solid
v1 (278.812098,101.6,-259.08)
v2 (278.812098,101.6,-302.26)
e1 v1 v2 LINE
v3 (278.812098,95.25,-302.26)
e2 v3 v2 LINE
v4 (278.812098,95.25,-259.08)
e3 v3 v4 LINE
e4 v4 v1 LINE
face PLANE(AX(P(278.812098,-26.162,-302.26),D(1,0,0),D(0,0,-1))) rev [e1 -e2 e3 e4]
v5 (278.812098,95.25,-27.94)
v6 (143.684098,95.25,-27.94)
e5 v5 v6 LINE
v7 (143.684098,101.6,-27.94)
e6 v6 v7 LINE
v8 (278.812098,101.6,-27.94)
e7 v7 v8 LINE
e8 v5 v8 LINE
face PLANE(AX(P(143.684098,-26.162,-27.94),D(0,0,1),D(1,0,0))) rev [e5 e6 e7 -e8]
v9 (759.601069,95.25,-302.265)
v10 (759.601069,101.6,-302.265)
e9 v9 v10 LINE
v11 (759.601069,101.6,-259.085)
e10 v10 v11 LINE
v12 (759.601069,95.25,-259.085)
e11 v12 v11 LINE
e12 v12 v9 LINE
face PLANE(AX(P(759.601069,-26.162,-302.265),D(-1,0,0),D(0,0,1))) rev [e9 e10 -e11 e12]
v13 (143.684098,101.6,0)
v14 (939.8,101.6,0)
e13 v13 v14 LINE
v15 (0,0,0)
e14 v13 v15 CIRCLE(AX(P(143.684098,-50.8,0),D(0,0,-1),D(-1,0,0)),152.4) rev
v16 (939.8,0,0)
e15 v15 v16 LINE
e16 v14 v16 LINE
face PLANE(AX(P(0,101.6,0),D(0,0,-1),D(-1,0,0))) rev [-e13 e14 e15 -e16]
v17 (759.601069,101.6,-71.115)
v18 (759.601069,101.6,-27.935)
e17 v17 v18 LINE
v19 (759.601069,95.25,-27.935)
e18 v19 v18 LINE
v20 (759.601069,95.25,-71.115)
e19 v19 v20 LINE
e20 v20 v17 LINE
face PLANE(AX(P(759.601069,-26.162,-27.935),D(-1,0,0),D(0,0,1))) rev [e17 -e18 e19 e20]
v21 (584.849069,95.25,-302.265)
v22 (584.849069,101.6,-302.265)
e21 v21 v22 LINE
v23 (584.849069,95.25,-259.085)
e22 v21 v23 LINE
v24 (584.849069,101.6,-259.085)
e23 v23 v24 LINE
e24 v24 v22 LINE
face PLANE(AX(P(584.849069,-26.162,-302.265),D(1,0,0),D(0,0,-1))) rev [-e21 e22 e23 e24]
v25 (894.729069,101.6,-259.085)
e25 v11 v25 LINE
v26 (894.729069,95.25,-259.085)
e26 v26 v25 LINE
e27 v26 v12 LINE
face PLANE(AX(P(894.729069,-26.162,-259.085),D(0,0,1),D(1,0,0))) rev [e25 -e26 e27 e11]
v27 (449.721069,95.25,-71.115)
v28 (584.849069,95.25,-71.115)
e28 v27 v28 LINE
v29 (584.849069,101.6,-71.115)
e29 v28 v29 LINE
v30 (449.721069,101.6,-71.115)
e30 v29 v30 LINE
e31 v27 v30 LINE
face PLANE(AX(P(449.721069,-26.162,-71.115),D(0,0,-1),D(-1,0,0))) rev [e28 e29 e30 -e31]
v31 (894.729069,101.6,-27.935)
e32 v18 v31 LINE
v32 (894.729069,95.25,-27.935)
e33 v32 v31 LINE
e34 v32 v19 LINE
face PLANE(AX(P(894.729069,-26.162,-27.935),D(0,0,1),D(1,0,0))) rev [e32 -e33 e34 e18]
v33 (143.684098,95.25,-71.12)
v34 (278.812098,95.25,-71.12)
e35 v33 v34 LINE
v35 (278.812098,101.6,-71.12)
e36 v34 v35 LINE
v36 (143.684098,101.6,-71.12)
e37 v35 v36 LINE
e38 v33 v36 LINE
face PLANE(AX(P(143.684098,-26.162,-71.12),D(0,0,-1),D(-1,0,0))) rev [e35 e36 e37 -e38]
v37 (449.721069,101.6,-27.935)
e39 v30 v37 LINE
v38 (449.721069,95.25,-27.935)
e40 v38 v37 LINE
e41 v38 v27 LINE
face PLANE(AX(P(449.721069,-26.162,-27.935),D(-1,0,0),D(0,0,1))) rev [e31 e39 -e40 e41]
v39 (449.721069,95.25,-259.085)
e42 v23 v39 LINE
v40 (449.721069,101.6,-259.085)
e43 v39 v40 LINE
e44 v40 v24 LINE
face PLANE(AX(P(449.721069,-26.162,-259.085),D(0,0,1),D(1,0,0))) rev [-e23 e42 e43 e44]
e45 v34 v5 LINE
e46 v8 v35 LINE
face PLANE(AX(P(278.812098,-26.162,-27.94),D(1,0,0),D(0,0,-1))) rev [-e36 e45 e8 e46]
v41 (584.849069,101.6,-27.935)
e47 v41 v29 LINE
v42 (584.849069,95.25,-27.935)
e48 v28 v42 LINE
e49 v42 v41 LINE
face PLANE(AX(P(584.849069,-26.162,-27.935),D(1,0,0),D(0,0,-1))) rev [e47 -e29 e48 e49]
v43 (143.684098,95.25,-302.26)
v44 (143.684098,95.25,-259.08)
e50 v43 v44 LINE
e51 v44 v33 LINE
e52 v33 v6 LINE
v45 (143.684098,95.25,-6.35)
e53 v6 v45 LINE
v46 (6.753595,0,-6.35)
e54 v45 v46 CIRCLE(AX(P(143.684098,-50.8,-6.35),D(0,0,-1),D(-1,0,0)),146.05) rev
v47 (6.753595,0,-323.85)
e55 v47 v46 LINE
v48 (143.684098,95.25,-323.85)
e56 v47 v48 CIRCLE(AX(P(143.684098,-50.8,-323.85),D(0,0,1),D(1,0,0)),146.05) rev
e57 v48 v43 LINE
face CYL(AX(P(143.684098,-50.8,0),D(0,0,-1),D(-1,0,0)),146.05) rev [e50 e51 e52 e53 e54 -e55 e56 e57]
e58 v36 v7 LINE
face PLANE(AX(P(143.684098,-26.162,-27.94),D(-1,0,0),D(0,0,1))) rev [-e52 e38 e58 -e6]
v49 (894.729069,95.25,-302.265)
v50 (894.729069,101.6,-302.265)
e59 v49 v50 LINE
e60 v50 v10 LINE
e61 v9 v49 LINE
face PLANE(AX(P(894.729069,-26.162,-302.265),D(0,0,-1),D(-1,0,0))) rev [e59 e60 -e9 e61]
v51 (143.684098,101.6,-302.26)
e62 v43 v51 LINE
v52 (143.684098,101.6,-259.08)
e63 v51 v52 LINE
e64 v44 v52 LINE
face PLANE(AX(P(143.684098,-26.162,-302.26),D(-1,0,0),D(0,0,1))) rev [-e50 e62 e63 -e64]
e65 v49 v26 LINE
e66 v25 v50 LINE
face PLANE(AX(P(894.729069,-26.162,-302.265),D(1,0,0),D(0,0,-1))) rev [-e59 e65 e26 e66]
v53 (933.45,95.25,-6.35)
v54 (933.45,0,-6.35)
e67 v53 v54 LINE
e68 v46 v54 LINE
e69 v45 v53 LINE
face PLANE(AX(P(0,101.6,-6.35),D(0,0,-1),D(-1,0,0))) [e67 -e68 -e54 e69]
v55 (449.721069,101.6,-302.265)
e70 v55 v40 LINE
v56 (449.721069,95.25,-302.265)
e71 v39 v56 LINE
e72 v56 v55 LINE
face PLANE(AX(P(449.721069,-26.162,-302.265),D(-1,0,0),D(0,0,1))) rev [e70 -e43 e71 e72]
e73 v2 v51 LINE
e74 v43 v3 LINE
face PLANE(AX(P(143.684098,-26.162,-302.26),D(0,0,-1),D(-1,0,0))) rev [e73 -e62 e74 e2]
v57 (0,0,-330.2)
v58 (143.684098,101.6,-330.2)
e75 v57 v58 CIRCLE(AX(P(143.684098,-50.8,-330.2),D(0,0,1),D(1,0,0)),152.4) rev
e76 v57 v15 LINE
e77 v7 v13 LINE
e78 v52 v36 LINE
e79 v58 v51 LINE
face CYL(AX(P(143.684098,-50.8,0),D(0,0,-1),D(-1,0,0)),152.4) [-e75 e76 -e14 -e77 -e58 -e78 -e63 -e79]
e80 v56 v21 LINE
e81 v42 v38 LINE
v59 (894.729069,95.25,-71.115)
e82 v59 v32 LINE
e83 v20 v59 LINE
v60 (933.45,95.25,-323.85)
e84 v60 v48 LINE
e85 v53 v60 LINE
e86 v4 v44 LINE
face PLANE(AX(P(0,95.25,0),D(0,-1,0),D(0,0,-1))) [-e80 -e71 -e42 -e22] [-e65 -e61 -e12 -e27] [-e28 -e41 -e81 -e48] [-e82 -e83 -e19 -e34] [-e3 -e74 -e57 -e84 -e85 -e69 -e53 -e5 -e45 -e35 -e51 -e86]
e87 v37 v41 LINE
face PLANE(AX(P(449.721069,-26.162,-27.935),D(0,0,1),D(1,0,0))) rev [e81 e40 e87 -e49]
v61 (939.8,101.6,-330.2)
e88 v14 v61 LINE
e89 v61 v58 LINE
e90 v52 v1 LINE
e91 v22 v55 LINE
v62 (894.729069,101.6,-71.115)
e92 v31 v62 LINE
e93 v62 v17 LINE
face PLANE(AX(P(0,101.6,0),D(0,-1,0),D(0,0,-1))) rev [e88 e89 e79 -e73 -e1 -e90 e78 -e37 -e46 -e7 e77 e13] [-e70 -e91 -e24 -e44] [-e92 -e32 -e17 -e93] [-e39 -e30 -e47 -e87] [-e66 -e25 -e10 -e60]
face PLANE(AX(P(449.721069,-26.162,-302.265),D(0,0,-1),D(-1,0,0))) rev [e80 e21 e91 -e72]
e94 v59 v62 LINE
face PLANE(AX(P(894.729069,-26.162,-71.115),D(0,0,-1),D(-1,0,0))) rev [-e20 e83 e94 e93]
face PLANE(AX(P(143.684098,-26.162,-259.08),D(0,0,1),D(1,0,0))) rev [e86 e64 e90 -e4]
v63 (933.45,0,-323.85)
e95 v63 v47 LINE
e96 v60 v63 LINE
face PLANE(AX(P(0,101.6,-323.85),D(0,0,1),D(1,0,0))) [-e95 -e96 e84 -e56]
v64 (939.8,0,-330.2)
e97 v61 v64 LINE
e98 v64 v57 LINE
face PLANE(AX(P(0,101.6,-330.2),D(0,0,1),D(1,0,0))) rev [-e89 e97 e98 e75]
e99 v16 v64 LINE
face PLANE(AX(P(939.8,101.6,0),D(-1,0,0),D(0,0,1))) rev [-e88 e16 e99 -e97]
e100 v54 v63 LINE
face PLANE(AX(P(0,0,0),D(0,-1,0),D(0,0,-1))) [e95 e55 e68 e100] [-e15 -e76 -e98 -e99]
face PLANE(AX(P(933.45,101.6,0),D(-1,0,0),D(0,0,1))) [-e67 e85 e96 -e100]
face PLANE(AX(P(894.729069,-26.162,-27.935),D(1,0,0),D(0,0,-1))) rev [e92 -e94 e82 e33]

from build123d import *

# Parameters (mm, degrees)
SKETCH1_W           = 939.8
SKETCH1_H           = 330.2
BOSS_EXTRUDE1_DEPTH = 101.6
FILLET1_R           = 152.4
SHELL1_T            = -6.35
SKETCH3_W           = 135.128
SKETCH3_H           = 43.18
CUT_EXTRUDE1_DEPTH  = 127.762


with BuildPart() as part:
    # Sketch1 → Boss-Extrude1 (new body)
    with BuildSketch(Plane(origin=(0, 0, 0), x_dir=(1, 0, 0), z_dir=(0, 1, 0))):
        with Locations((469.9, 165.1)):
            Rectangle(SKETCH1_W, SKETCH1_H)
    extrude(amount=BOSS_EXTRUDE1_DEPTH)

    # Fillet1
    # the kernel refuses this fillet: 152.4 mm, written as the material it takes off along each edge
    with BuildSketch(Plane(origin=(0, 101.6, -689.410244843), x_dir=(0, -1, 0), z_dir=(0, 0, 1))) as fillet1_piece_1:
        with BuildLine():
            CenterArc((152.4, 143.684097937), FILLET1_R, 180, 70.528779366)
            Line((0, 143.684097937), (-3.048, 143.684097937))
            Line((-3.048, 143.684097937), (-3.048, 0))
            Line((-3.048, 0), (0, -3.048))
            ThreePointArc((0, -3.048), (50.8, -3.048), (100.584, -2.873681959))
            Line((100.584, -2.873681959), (101.6, 0))
        make_face()
    extrude(amount=1048.620489686, mode=Mode.SUBTRACT)

    # Shell1
    shell1_openings = [part.faces().sort_by_distance(p)[0] for p in [
        (469.9, 0, -165.1),
    ]]
    offset(amount=SHELL1_T, openings=shell1_openings, kind=Kind.INTERSECTION)

    # Sketch3 → Cut-Extrude1 (cut)
    with BuildSketch(Plane(origin=(0, 101.6, 0), x_dir=(1, 0, 0), z_dir=(0, 1, 0))):
        with Locations((517.285069024, 49.525)):
            Rectangle(SKETCH3_W, SKETCH3_H)
        with Locations((827.165069024, 280.675)):
            Rectangle(SKETCH3_W, SKETCH3_H)
        with Locations((827.165069024, 49.525)):
            Rectangle(SKETCH3_W, SKETCH3_H)
        with Locations((517.285069024, 280.675)):
            Rectangle(SKETCH3_W, SKETCH3_H)
        with Locations((211.248097937, 280.67)):
            Rectangle(SKETCH3_W, SKETCH3_H)
        with Locations((211.248097937, 49.53)):
            Rectangle(SKETCH3_W, SKETCH3_H)
    extrude(amount=-CUT_EXTRUDE1_DEPTH, mode=Mode.SUBTRACT)


solid = part.part
